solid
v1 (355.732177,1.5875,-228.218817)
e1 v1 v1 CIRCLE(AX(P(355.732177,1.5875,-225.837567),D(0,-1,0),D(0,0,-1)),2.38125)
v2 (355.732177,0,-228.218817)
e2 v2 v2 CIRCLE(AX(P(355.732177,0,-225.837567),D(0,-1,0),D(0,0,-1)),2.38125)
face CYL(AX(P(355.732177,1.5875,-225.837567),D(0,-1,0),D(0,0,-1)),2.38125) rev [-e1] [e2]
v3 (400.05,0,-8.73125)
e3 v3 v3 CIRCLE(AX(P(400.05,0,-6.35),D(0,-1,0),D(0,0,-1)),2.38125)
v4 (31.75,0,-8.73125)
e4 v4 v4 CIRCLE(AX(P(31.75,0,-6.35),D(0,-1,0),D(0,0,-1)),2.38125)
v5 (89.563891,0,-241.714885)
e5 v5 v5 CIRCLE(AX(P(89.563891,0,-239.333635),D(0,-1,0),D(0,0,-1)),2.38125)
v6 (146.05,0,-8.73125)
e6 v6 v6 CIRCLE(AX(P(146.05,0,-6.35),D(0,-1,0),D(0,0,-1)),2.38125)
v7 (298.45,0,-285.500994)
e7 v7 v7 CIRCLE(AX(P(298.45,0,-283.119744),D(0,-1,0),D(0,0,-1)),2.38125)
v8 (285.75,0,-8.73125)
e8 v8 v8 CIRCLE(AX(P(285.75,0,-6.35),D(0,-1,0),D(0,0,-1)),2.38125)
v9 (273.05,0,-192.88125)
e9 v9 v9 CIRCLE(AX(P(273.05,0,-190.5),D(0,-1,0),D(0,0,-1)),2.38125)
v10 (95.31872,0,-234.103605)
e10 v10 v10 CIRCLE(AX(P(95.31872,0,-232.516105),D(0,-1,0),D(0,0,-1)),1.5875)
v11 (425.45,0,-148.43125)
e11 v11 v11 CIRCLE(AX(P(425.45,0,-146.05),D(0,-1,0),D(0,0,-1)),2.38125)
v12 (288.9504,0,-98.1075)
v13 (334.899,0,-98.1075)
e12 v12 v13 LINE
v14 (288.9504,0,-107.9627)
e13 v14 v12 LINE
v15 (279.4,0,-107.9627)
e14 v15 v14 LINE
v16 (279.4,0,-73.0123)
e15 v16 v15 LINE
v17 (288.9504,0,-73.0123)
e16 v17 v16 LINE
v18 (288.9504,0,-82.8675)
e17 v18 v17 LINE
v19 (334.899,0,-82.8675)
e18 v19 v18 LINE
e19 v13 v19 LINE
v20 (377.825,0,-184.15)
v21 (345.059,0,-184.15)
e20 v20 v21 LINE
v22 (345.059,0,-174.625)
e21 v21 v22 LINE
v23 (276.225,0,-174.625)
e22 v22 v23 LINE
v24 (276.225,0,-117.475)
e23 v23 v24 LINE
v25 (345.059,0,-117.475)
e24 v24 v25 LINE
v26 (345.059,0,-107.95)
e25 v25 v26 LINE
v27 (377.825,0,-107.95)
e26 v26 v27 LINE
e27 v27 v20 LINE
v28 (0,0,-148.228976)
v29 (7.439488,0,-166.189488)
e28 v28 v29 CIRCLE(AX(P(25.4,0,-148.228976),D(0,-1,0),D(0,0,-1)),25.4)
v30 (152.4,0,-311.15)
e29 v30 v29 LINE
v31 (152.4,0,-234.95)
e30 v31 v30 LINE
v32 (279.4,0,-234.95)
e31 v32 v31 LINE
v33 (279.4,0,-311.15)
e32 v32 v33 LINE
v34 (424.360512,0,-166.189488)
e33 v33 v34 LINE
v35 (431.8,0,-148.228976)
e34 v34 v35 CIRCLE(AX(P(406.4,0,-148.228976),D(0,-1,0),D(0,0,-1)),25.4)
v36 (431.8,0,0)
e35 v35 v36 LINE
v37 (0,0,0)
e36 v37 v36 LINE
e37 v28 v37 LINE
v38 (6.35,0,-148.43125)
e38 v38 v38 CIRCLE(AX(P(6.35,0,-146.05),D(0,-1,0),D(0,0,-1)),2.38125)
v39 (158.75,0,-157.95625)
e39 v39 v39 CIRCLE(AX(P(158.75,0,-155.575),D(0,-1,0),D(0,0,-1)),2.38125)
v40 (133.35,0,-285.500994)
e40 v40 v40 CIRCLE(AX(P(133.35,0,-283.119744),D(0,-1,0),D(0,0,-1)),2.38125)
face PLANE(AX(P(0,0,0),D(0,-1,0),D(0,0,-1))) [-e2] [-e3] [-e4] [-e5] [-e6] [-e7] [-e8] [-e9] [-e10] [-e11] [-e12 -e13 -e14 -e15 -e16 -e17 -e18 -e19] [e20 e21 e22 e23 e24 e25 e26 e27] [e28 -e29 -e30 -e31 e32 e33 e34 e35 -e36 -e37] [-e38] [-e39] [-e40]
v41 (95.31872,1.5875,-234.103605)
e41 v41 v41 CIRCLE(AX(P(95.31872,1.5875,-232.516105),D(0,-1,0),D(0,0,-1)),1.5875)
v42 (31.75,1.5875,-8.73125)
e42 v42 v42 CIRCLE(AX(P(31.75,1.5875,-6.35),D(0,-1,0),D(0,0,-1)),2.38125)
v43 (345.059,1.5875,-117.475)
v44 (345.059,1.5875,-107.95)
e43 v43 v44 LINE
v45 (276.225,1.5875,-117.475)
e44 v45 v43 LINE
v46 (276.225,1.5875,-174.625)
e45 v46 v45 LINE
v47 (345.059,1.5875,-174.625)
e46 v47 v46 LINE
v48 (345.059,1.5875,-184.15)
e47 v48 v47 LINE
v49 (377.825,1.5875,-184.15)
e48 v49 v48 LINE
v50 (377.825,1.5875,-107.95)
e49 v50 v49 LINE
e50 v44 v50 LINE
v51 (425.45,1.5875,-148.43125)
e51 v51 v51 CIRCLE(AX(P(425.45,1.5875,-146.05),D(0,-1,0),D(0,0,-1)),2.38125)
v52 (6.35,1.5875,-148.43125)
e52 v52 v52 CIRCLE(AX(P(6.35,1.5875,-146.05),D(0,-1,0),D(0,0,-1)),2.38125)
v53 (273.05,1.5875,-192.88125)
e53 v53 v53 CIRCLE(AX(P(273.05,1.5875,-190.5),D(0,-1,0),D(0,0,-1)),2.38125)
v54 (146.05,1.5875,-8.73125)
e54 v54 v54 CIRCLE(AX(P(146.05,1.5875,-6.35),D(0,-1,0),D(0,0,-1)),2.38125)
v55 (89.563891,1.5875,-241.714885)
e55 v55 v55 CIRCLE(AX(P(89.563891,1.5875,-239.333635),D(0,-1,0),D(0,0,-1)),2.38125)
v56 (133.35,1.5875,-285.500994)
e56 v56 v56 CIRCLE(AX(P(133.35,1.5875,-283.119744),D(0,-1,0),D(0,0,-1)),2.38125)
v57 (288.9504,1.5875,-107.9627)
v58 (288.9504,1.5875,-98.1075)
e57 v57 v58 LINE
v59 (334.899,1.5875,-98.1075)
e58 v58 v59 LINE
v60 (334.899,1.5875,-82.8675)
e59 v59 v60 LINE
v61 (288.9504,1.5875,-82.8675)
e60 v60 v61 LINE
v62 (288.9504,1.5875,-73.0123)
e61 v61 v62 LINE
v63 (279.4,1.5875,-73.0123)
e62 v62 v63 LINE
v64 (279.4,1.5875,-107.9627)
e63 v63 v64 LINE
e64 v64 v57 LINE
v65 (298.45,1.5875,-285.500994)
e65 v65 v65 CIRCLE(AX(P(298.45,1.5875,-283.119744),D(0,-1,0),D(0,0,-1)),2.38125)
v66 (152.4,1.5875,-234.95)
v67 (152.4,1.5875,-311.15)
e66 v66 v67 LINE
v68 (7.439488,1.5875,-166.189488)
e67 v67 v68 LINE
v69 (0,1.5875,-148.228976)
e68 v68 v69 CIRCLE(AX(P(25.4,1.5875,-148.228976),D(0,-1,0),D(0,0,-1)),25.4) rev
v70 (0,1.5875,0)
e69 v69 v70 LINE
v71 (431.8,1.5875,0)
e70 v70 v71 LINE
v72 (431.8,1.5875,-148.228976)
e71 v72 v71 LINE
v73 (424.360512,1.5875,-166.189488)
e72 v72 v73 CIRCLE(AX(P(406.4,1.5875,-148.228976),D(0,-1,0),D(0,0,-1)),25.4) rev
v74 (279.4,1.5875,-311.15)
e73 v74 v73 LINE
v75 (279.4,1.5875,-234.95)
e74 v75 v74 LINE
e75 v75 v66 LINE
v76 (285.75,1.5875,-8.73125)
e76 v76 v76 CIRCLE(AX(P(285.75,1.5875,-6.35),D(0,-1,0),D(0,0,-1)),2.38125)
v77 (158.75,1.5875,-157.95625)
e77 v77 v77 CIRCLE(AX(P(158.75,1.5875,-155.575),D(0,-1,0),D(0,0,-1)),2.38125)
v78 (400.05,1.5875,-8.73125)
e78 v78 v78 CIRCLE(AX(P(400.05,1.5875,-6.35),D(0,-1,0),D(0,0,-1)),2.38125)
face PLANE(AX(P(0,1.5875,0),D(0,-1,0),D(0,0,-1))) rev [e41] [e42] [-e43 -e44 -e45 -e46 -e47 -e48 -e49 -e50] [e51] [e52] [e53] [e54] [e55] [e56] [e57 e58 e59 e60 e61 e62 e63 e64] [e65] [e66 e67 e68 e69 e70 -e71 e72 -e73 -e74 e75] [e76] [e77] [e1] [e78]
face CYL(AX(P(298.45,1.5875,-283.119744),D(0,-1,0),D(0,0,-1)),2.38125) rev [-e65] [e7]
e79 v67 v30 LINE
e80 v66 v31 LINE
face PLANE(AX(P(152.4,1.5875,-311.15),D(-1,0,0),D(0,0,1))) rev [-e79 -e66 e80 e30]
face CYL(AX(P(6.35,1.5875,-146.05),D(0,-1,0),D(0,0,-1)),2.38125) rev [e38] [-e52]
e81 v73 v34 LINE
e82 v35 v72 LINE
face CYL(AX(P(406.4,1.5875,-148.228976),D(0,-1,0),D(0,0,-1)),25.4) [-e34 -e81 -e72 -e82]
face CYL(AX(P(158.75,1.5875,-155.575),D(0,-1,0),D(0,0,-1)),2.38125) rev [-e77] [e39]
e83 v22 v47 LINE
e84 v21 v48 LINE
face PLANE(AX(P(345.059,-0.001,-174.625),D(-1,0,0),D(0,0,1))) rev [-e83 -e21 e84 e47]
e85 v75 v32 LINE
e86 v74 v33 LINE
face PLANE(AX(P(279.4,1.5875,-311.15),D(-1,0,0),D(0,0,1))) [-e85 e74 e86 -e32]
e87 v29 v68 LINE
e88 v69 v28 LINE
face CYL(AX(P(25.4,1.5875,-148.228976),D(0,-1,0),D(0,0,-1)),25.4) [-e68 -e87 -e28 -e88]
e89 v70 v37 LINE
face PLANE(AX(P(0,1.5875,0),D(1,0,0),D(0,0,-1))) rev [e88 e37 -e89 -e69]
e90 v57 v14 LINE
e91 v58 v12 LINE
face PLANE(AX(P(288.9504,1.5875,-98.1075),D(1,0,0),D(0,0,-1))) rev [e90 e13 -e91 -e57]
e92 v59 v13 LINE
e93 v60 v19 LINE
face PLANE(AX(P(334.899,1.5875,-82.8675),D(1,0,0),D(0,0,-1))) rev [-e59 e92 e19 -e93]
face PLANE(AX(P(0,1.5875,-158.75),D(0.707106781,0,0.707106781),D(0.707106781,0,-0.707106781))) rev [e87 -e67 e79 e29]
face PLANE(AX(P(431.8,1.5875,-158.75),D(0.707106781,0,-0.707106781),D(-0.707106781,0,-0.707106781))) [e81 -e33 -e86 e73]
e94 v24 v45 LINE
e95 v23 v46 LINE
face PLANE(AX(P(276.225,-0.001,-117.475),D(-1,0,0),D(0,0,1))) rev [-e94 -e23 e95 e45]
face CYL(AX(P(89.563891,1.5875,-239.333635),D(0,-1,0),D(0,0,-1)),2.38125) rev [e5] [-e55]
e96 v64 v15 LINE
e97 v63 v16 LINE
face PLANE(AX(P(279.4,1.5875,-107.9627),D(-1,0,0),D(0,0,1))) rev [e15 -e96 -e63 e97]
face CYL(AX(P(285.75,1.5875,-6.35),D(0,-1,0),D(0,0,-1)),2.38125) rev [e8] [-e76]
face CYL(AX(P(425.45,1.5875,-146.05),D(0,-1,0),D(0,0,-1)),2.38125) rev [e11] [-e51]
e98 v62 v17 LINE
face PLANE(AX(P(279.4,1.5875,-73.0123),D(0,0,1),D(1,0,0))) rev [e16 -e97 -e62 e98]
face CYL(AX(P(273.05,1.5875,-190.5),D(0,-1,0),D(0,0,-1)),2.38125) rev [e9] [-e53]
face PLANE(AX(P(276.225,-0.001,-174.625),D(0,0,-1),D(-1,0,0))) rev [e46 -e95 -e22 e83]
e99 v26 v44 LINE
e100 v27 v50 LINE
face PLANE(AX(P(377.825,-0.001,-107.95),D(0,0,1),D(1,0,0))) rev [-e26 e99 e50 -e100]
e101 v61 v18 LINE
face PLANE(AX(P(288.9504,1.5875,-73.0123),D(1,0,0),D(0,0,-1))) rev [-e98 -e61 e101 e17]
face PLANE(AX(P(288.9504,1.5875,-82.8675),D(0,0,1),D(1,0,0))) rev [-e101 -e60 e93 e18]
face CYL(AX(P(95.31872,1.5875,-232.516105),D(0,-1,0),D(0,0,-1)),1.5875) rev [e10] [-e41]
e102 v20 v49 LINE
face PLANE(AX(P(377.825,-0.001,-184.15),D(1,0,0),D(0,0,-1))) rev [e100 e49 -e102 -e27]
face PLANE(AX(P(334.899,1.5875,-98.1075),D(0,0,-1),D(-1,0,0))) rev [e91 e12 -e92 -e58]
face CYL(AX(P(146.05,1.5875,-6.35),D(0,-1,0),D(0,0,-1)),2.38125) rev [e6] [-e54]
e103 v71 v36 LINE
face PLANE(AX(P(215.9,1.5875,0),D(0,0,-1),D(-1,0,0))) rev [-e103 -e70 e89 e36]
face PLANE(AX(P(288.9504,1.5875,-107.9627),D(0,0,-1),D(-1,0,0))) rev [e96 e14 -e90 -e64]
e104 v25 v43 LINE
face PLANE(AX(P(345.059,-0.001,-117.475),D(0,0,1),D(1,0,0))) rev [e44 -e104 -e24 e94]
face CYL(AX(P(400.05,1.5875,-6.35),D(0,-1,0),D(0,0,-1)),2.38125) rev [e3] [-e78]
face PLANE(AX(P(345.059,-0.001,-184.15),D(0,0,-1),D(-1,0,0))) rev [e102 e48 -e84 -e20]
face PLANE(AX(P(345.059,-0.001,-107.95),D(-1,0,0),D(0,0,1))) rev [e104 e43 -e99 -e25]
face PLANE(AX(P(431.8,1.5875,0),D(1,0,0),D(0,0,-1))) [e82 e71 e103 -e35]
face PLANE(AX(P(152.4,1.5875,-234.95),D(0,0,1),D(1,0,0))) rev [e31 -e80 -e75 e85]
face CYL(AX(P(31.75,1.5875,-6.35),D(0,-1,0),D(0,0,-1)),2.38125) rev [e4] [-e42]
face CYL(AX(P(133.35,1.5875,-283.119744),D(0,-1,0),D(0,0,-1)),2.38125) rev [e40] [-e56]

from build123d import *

# Parameters (mm, degrees)
EXTRUDE1_DEPTH     = 1.5875
MIRROR1_DEPTH      = 1.5875
CUT_EXTRUDE1_REACH = 534.229
SKETCH3_R          = 1.5875
CUT_EXTRUDE2_DEPTH = 533.229351555
SKETCH4_R          = 2.38125
SKETCH4_R_2        = 2.381250001
CUT_EXTRUDE3_DEPTH = 533.229351555
CUT_EXTRUDE4_DEPTH = 533.229351555
FILLET1_R          = 25.4


# Read off the part's stored shape, not the designer's step: Mirror1
with BuildPart() as part:
    # Sketch1 → Extrude1 (new body)
    with BuildSketch(Plane(origin=(0, 0, 0), x_dir=(1, 0, 0), z_dir=(0, 1, 0))):
        Polygon((0, 0), (0, 158.75), (152.4, 311.15), (152.4, 234.95), (215.9, 234.95), (215.9, 0), align=None)
    extrude(amount=EXTRUDE1_DEPTH)

    # Mirror1 outline → Mirror1 (add)
    with BuildSketch(Plane(origin=(0, 0, 0), x_dir=(1, 0, 0), z_dir=(0, 1, 0))):
        Polygon((215.9, 0), (431.8, 0), (431.8, 158.75), (279.4, 311.15), (279.4, 234.95), (215.9, 234.95), align=None)
    extrude(amount=MIRROR1_DEPTH)

    # Sketch2 → Cut-Extrude1 (cut, up to next)
    with BuildSketch(Plane(origin=(0, 1.5875, 0), x_dir=(-1, 0, 0), z_dir=(0, 1, 0)), mode=Mode.PRIVATE) as cut_extrude1_sk1:
        Polygon((-276.225, -174.625), (-345.059, -174.625), (-345.059, -184.15), (-377.825, -184.15), (-377.825, -107.95), (-345.059, -107.95), (-345.059, -117.475), (-276.225, -117.475), align=None)
    cut_extrude1_tool1 = extrude(cut_extrude1_sk1.sketch, amount=-CUT_EXTRUDE1_REACH, mode=Mode.PRIVATE) & part.part
    add(cut_extrude1_tool1.solids().sort_by_distance((330.365702, 1.5875, -146.05))[0], mode=Mode.SUBTRACT)

    # Sketch3 → Cut-Extrude2 (cut, through all)
    with BuildSketch(Plane.XZ):
        with Locations(Location((95.31871999, -232.5161053, 0), (0, 0, 270))):
            Circle(SKETCH3_R)
    extrude(amount=-CUT_EXTRUDE2_DEPTH, mode=Mode.SUBTRACT)

    # Sketch4 → Cut-Extrude3 (cut, through all)
    with BuildSketch(Plane.XZ):
        with Locations(Location((133.35, -283.119743879, 0), (0, 0, 270))):
            Circle(SKETCH4_R)
        with Locations(Location((273.05, -190.5, 0), (0, 0, 270))):
            Circle(SKETCH4_R)
        with Locations(Location((158.75, -155.575, 0), (0, 0, 270))):
            Circle(SKETCH4_R)
        with Locations(Location((298.45, -283.119743879, 0), (0, 0, 270))):
            Circle(SKETCH4_R)
        with Locations(Location((355.732177028, -225.837566851, 0), (0, 0, 270))):
            Circle(SKETCH4_R_2)
        with Locations(Location((425.45, -146.05, 0), (0, 0, 270))):
            Circle(SKETCH4_R)
        with Locations(Location((400.05, -6.35, 0), (0, 0, 270))):
            Circle(SKETCH4_R)
        with Locations(Location((31.75, -6.35, 0), (0, 0, 270))):
            Circle(SKETCH4_R)
        with Locations(Location((146.05, -6.35, 0), (0, 0, 270))):
            Circle(SKETCH4_R)
        with Locations(Location((285.75, -6.35, 0), (0, 0, 270))):
            Circle(SKETCH4_R)
        with Locations(Location((6.35, -146.05, 0), (0, 0, 270))):
            Circle(SKETCH4_R)
        with Locations(Location((89.563891484, -239.333635363, 0), (0, 0, 270))):
            Circle(SKETCH4_R)
    extrude(amount=-CUT_EXTRUDE3_DEPTH, mode=Mode.SUBTRACT)

    # Sketch5 → Cut-Extrude4 (cut, through all)
    with BuildSketch(Plane.XZ):
        Polygon((279.4, -107.9627), (279.4, -73.0123), (288.9504, -73.0123), (288.9504, -82.8675), (334.899, -82.8675), (334.899, -98.1075), (288.9504, -98.1075), (288.9504, -107.9627), align=None)
    extrude(amount=-CUT_EXTRUDE4_DEPTH, mode=Mode.SUBTRACT)

    # Fillet1
    fillet1_edges = [part.edges().sort_by_distance(p)[0] for p in [
        (0, 0.79375, -158.75),
        (431.8, 0.79375, -158.75),
    ]]
    fillet(fillet1_edges, radius=FILLET1_R)


solid = part.part
